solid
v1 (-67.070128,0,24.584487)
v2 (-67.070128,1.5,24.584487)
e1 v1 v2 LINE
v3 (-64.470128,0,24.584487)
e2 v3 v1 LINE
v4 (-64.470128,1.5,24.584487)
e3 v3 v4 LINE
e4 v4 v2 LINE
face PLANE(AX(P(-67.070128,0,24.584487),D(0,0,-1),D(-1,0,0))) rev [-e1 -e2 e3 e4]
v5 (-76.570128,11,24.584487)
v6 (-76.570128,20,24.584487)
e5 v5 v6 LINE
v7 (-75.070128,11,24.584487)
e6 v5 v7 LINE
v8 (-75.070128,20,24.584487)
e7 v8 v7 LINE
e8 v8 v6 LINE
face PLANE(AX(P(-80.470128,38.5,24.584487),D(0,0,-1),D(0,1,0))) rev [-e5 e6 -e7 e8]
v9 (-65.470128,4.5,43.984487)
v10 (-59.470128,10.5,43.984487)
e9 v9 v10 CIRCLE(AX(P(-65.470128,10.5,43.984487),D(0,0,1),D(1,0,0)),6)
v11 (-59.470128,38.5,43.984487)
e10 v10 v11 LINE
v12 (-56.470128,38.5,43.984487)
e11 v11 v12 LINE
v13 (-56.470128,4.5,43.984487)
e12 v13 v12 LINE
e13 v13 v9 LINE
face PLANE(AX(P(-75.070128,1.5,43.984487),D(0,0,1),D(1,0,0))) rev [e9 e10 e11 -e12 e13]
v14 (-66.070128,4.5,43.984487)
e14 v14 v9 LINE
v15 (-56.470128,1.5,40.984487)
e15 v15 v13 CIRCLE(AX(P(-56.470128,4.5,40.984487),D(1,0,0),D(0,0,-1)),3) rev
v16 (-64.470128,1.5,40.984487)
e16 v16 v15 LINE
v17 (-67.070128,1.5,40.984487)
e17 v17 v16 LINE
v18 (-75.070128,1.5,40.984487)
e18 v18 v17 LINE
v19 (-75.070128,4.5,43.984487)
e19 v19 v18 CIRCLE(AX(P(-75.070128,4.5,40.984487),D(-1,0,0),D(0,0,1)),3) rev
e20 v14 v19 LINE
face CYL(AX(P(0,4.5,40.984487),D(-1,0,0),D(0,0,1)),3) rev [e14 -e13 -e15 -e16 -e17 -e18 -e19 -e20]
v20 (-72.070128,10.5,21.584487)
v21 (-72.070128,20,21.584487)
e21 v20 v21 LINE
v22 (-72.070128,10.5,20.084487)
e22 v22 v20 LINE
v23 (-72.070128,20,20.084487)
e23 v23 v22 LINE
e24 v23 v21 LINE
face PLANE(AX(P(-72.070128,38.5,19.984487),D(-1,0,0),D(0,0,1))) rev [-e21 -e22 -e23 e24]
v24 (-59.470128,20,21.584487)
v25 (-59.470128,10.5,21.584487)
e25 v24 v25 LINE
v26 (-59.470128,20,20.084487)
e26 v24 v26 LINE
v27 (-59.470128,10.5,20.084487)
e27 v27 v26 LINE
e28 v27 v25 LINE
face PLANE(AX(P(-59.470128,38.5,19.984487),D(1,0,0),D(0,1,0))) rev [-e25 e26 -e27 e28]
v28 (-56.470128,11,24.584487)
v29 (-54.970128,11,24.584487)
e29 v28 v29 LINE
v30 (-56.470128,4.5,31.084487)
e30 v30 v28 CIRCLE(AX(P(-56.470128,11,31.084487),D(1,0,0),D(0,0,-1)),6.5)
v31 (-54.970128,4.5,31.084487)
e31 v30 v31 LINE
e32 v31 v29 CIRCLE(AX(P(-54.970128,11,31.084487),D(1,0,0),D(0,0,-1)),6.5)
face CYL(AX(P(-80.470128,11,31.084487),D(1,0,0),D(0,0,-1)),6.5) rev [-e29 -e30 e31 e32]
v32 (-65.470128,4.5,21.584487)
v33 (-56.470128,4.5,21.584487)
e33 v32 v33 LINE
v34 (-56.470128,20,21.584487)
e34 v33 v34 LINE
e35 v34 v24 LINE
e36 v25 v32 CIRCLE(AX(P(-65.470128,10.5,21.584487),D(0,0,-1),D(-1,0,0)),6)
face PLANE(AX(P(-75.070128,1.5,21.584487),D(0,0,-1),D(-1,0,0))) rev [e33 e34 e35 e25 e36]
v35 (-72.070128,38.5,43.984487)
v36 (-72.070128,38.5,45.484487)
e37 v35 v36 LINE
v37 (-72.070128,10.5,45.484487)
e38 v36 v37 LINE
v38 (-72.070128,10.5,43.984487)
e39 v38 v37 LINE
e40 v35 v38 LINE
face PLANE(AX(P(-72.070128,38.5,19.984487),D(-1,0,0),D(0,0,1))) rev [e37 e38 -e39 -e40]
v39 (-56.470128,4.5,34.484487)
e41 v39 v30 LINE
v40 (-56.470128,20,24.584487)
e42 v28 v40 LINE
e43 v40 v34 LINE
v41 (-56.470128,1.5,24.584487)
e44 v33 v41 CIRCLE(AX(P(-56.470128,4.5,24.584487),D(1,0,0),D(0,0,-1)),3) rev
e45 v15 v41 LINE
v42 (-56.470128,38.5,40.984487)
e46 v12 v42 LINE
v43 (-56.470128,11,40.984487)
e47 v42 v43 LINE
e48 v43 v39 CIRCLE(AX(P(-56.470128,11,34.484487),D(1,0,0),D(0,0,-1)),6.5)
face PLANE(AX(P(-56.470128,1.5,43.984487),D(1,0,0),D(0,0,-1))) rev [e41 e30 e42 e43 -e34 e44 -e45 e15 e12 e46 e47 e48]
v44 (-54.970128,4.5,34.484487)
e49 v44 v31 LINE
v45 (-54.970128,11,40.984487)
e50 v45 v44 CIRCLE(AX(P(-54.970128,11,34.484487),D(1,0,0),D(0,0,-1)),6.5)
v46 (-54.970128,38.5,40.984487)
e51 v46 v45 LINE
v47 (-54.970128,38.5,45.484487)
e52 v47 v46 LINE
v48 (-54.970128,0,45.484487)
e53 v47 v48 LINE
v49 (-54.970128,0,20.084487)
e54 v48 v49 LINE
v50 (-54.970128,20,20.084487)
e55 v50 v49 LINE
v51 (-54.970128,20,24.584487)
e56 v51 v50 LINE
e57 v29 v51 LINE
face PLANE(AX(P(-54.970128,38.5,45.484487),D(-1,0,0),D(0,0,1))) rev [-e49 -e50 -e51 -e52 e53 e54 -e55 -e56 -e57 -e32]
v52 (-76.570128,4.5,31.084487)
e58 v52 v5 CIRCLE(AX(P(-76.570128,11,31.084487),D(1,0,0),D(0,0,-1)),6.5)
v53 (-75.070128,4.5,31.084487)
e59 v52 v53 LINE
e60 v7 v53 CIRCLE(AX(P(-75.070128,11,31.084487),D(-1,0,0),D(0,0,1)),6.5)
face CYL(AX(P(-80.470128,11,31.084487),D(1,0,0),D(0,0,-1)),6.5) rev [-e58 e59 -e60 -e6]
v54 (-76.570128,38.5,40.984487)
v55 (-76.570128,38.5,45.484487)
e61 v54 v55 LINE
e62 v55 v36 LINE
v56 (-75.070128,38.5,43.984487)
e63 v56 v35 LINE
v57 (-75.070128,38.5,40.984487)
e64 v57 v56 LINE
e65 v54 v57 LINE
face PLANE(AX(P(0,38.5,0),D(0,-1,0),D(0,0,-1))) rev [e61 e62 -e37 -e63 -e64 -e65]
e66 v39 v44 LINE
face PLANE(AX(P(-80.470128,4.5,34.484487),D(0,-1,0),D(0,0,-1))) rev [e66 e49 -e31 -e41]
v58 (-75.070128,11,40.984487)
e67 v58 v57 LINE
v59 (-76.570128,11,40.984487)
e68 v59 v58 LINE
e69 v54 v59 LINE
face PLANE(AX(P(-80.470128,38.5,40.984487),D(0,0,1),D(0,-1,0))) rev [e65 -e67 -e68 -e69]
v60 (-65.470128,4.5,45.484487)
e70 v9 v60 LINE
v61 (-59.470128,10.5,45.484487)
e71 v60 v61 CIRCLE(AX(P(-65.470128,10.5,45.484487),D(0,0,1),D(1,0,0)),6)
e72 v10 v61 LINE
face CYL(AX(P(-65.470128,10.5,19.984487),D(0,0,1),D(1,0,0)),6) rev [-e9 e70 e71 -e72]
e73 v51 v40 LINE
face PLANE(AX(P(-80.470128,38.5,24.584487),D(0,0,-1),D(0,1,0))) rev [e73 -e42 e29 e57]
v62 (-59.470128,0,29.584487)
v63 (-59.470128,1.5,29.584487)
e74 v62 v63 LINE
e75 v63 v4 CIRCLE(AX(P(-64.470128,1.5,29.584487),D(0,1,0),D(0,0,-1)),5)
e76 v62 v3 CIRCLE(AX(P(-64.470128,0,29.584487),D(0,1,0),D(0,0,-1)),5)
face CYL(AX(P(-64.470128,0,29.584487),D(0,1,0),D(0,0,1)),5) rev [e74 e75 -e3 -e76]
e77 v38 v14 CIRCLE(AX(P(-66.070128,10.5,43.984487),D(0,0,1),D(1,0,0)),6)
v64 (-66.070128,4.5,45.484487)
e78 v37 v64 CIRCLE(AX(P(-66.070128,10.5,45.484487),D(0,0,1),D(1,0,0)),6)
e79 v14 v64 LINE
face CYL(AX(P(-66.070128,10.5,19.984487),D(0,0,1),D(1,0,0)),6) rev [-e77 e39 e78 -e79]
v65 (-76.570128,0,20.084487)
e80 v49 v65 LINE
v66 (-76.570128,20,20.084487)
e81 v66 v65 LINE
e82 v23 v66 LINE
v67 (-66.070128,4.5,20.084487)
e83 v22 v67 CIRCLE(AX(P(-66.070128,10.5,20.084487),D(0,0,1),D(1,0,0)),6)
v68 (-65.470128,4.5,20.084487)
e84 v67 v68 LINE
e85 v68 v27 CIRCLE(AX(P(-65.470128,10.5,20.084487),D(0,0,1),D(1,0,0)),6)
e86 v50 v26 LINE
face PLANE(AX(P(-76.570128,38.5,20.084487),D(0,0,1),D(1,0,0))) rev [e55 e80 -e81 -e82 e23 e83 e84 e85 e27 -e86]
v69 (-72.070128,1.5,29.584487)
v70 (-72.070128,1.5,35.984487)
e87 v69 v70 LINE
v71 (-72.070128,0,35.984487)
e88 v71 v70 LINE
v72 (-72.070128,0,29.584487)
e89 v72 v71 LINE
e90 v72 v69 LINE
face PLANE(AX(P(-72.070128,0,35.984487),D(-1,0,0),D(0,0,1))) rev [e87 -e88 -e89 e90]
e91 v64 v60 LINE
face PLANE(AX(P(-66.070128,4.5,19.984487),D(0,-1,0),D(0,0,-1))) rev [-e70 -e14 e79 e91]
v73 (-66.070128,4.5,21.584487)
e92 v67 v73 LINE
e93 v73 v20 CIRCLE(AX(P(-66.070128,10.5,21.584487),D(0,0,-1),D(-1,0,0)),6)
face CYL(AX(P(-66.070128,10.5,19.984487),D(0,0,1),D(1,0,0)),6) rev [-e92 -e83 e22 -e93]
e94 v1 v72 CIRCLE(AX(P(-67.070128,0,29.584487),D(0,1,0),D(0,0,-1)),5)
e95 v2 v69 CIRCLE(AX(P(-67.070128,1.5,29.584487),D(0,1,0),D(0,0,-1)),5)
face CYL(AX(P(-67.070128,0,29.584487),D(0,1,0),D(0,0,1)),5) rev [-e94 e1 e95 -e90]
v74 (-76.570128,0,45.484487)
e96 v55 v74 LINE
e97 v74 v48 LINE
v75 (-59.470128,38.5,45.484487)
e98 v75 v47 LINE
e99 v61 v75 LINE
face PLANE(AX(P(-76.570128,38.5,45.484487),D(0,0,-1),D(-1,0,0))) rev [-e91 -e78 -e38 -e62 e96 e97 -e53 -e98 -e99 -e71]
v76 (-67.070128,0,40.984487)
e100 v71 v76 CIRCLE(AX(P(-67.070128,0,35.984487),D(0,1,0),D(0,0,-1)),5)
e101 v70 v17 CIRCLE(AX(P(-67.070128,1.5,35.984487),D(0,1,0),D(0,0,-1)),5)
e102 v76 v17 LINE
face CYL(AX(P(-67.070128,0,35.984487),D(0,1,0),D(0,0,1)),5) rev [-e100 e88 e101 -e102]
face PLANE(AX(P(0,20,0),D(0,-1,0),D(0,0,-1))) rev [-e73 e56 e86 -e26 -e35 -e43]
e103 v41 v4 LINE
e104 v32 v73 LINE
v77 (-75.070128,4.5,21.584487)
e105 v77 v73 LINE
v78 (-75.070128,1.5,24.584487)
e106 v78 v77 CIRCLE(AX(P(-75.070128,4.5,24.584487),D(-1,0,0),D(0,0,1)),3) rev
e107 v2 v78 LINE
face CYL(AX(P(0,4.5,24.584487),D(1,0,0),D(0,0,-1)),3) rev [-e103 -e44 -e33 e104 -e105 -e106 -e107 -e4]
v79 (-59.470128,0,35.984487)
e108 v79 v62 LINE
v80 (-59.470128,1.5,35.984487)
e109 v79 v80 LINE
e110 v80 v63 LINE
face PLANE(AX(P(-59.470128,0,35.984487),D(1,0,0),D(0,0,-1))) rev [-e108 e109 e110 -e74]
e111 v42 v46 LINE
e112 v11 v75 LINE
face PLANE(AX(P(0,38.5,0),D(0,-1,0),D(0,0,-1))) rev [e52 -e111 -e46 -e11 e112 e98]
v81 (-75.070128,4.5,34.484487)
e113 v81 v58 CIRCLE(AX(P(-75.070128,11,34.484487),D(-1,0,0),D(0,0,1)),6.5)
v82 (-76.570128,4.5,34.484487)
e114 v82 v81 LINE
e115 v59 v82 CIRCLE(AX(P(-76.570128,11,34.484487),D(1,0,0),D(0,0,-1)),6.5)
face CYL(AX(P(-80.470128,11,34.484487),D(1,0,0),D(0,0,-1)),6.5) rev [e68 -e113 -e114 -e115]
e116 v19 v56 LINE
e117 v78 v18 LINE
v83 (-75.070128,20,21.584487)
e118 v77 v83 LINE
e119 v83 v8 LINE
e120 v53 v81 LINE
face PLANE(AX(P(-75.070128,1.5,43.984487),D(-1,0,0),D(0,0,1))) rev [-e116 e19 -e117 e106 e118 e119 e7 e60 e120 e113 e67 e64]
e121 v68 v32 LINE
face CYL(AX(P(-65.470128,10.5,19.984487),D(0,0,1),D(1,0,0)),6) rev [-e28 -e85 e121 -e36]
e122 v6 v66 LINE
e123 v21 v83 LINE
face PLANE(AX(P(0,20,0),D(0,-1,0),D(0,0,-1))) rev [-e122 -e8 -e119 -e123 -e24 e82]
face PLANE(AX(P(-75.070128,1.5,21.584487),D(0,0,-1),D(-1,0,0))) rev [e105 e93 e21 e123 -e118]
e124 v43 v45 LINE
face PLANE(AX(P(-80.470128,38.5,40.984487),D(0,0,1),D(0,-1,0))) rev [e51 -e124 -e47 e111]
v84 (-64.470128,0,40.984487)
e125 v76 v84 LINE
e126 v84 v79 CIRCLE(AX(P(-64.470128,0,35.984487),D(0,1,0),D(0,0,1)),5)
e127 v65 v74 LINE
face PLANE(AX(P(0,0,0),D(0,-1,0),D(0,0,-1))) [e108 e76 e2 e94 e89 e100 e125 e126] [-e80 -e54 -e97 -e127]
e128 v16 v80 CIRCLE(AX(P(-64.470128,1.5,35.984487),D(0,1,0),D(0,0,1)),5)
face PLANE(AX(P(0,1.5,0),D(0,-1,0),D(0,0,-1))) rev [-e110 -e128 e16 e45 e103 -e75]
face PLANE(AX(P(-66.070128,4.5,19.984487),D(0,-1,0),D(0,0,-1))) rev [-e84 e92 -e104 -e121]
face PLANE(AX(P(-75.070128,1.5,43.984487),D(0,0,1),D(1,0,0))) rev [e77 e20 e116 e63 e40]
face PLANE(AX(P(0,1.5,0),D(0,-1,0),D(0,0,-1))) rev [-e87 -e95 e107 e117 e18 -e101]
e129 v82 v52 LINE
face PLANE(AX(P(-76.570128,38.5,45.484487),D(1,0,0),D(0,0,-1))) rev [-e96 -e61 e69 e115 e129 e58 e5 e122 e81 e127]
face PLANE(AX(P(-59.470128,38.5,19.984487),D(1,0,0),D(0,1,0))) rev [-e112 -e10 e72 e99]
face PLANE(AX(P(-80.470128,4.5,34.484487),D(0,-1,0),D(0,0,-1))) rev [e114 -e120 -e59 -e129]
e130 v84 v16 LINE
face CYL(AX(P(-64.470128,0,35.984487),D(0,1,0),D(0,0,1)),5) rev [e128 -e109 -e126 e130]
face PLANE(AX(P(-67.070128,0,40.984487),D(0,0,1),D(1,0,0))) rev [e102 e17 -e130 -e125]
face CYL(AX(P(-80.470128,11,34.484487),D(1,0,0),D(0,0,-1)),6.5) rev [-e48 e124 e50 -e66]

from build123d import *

# Parameters (mm, degrees)
SKETCH1_W           = 21.6
SKETCH1_H           = 25.4
BOSS_EXTRUDE1_DEPTH = 38.5
SKETCH2_W           = 18.6
SKETCH2_H           = 22.4
CUT_EXTRUDE1_DEPTH  = 37
CUT_EXTRUDE2_DEPTH  = 25.5
CUT_EXTRUDE3_DEPTH  = 25.5
CUT_EXTRUDE4_DEPTH  = 1.5
FILLET2_R           = 3
FILLET3_R           = 3
SKETCH7_W           = 21.6
SKETCH7_H           = 4.5
CUT_EXTRUDE5_DEPTH  = 18.5


with BuildPart() as part:
    # Sketch1 → Boss-Extrude1 (new body)
    with BuildSketch(Plane(origin=(0, 0, 0), x_dir=(1, 0, 0), z_dir=(0, 1, 0))):
        with Locations((-65.770128024, -32.78448737)):
            Rectangle(SKETCH1_W, SKETCH1_H)
    extrude(amount=BOSS_EXTRUDE1_DEPTH)

    # Sketch2 → Cut-Extrude1 (cut)
    with BuildSketch(Plane(origin=(0, 38.5, 0), x_dir=(1, 0, 0), z_dir=(0, 1, 0))):
        with Locations((-65.770128024, -32.78448737)):
            Rectangle(SKETCH2_W, SKETCH2_H)
    extrude(amount=-CUT_EXTRUDE1_DEPTH, mode=Mode.SUBTRACT)

    # Sketch5 → Cut-Extrude2 (cut)
    with BuildSketch(Plane.XY.offset(45.48448737)):
        with BuildLine():
            Line((-72.070128024, 38.5), (-59.470128024, 38.5))
            Line((-59.470128024, 38.5), (-59.470128024, 10.5))
            ThreePointArc((-59.470128024, 10.5), (-61.227487337, 6.257359313), (-65.470128024, 4.5))
            Line((-65.470128024, 4.5), (-66.070128024, 4.5))
            ThreePointArc((-66.070128024, 4.5), (-70.312768711, 6.257359313), (-72.070128024, 10.5))
            Line((-72.070128024, 10.5), (-72.070128024, 38.5))
        make_face()
    extrude(amount=-CUT_EXTRUDE2_DEPTH, mode=Mode.SUBTRACT)

    # Sketch3 → Cut-Extrude3 (cut)
    with BuildSketch(Plane(origin=(-54.970128024, 0, 0), x_dir=(0, 0, -1), z_dir=(1, 0, 0))):
        with BuildLine():
            Line((-40.98448737, 38.5), (-24.58448737, 38.5))
            Line((-24.58448737, 38.5), (-24.58448737, 11))
            ThreePointArc((-24.58448737, 11), (-26.488293292, 6.403805922), (-31.08448737, 4.5))
            Line((-31.08448737, 4.5), (-34.48448737, 4.5))
            ThreePointArc((-34.48448737, 4.5), (-39.080681448, 6.403805922), (-40.98448737, 11))
            Line((-40.98448737, 11), (-40.98448737, 38.5))
        make_face()
    extrude(amount=-CUT_EXTRUDE3_DEPTH, mode=Mode.SUBTRACT)

    # Sketch6 → Cut-Extrude4 (cut)
    with BuildSketch(Plane(origin=(0, 1.5, 0), x_dir=(1, 0, 0), z_dir=(0, 1, 0))):
        with BuildLine():
            Line((-67.070128024, -40.98448737), (-64.470128024, -40.98448737))
            ThreePointArc((-64.470128024, -40.98448737), (-60.934594118, -39.520021276), (-59.470128024, -35.98448737))
            Line((-59.470128024, -35.98448737), (-59.470128024, -29.58448737))
            ThreePointArc((-59.470128024, -29.58448737), (-60.934594118, -26.048953464), (-64.470128024, -24.58448737))
            Line((-64.470128024, -24.58448737), (-67.070128024, -24.58448737))
            ThreePointArc((-67.070128024, -24.58448737), (-70.60566193, -26.048953464), (-72.070128024, -29.58448737))
            Line((-72.070128024, -29.58448737), (-72.070128024, -35.98448737))
            ThreePointArc((-72.070128024, -35.98448737), (-70.60566193, -39.520021276), (-67.070128024, -40.98448737))
        make_face()
    extrude(amount=-CUT_EXTRUDE4_DEPTH, mode=Mode.SUBTRACT)

    # Fillet2
    fillet2_edges = [part.edges().sort_by_distance(p)[0] for p in [
        (-65.770128024, 1.5, 43.98448737),
    ]]
    fillet(fillet2_edges, radius=FILLET2_R - 0.0001)  # a hair under: the kernel refuses the full size

    # Fillet3
    fillet3_edges = [part.edges().sort_by_distance(p)[0] for p in [
        (-65.770128024, 1.5, 21.58448737),
    ]]
    fillet(fillet3_edges, radius=FILLET3_R - 0.0001)  # a hair under: the kernel refuses the full size

    # Sketch7 → Cut-Extrude5 (cut)
    with BuildSketch(Plane(origin=(0, 38.5, 0), x_dir=(1, 0, 0), z_dir=(0, 1, 0))):
        with Locations((-65.770128024, -22.33448737)):
            Rectangle(SKETCH7_W, SKETCH7_H)
    extrude(amount=-CUT_EXTRUDE5_DEPTH, mode=Mode.SUBTRACT)


solid = part.part
